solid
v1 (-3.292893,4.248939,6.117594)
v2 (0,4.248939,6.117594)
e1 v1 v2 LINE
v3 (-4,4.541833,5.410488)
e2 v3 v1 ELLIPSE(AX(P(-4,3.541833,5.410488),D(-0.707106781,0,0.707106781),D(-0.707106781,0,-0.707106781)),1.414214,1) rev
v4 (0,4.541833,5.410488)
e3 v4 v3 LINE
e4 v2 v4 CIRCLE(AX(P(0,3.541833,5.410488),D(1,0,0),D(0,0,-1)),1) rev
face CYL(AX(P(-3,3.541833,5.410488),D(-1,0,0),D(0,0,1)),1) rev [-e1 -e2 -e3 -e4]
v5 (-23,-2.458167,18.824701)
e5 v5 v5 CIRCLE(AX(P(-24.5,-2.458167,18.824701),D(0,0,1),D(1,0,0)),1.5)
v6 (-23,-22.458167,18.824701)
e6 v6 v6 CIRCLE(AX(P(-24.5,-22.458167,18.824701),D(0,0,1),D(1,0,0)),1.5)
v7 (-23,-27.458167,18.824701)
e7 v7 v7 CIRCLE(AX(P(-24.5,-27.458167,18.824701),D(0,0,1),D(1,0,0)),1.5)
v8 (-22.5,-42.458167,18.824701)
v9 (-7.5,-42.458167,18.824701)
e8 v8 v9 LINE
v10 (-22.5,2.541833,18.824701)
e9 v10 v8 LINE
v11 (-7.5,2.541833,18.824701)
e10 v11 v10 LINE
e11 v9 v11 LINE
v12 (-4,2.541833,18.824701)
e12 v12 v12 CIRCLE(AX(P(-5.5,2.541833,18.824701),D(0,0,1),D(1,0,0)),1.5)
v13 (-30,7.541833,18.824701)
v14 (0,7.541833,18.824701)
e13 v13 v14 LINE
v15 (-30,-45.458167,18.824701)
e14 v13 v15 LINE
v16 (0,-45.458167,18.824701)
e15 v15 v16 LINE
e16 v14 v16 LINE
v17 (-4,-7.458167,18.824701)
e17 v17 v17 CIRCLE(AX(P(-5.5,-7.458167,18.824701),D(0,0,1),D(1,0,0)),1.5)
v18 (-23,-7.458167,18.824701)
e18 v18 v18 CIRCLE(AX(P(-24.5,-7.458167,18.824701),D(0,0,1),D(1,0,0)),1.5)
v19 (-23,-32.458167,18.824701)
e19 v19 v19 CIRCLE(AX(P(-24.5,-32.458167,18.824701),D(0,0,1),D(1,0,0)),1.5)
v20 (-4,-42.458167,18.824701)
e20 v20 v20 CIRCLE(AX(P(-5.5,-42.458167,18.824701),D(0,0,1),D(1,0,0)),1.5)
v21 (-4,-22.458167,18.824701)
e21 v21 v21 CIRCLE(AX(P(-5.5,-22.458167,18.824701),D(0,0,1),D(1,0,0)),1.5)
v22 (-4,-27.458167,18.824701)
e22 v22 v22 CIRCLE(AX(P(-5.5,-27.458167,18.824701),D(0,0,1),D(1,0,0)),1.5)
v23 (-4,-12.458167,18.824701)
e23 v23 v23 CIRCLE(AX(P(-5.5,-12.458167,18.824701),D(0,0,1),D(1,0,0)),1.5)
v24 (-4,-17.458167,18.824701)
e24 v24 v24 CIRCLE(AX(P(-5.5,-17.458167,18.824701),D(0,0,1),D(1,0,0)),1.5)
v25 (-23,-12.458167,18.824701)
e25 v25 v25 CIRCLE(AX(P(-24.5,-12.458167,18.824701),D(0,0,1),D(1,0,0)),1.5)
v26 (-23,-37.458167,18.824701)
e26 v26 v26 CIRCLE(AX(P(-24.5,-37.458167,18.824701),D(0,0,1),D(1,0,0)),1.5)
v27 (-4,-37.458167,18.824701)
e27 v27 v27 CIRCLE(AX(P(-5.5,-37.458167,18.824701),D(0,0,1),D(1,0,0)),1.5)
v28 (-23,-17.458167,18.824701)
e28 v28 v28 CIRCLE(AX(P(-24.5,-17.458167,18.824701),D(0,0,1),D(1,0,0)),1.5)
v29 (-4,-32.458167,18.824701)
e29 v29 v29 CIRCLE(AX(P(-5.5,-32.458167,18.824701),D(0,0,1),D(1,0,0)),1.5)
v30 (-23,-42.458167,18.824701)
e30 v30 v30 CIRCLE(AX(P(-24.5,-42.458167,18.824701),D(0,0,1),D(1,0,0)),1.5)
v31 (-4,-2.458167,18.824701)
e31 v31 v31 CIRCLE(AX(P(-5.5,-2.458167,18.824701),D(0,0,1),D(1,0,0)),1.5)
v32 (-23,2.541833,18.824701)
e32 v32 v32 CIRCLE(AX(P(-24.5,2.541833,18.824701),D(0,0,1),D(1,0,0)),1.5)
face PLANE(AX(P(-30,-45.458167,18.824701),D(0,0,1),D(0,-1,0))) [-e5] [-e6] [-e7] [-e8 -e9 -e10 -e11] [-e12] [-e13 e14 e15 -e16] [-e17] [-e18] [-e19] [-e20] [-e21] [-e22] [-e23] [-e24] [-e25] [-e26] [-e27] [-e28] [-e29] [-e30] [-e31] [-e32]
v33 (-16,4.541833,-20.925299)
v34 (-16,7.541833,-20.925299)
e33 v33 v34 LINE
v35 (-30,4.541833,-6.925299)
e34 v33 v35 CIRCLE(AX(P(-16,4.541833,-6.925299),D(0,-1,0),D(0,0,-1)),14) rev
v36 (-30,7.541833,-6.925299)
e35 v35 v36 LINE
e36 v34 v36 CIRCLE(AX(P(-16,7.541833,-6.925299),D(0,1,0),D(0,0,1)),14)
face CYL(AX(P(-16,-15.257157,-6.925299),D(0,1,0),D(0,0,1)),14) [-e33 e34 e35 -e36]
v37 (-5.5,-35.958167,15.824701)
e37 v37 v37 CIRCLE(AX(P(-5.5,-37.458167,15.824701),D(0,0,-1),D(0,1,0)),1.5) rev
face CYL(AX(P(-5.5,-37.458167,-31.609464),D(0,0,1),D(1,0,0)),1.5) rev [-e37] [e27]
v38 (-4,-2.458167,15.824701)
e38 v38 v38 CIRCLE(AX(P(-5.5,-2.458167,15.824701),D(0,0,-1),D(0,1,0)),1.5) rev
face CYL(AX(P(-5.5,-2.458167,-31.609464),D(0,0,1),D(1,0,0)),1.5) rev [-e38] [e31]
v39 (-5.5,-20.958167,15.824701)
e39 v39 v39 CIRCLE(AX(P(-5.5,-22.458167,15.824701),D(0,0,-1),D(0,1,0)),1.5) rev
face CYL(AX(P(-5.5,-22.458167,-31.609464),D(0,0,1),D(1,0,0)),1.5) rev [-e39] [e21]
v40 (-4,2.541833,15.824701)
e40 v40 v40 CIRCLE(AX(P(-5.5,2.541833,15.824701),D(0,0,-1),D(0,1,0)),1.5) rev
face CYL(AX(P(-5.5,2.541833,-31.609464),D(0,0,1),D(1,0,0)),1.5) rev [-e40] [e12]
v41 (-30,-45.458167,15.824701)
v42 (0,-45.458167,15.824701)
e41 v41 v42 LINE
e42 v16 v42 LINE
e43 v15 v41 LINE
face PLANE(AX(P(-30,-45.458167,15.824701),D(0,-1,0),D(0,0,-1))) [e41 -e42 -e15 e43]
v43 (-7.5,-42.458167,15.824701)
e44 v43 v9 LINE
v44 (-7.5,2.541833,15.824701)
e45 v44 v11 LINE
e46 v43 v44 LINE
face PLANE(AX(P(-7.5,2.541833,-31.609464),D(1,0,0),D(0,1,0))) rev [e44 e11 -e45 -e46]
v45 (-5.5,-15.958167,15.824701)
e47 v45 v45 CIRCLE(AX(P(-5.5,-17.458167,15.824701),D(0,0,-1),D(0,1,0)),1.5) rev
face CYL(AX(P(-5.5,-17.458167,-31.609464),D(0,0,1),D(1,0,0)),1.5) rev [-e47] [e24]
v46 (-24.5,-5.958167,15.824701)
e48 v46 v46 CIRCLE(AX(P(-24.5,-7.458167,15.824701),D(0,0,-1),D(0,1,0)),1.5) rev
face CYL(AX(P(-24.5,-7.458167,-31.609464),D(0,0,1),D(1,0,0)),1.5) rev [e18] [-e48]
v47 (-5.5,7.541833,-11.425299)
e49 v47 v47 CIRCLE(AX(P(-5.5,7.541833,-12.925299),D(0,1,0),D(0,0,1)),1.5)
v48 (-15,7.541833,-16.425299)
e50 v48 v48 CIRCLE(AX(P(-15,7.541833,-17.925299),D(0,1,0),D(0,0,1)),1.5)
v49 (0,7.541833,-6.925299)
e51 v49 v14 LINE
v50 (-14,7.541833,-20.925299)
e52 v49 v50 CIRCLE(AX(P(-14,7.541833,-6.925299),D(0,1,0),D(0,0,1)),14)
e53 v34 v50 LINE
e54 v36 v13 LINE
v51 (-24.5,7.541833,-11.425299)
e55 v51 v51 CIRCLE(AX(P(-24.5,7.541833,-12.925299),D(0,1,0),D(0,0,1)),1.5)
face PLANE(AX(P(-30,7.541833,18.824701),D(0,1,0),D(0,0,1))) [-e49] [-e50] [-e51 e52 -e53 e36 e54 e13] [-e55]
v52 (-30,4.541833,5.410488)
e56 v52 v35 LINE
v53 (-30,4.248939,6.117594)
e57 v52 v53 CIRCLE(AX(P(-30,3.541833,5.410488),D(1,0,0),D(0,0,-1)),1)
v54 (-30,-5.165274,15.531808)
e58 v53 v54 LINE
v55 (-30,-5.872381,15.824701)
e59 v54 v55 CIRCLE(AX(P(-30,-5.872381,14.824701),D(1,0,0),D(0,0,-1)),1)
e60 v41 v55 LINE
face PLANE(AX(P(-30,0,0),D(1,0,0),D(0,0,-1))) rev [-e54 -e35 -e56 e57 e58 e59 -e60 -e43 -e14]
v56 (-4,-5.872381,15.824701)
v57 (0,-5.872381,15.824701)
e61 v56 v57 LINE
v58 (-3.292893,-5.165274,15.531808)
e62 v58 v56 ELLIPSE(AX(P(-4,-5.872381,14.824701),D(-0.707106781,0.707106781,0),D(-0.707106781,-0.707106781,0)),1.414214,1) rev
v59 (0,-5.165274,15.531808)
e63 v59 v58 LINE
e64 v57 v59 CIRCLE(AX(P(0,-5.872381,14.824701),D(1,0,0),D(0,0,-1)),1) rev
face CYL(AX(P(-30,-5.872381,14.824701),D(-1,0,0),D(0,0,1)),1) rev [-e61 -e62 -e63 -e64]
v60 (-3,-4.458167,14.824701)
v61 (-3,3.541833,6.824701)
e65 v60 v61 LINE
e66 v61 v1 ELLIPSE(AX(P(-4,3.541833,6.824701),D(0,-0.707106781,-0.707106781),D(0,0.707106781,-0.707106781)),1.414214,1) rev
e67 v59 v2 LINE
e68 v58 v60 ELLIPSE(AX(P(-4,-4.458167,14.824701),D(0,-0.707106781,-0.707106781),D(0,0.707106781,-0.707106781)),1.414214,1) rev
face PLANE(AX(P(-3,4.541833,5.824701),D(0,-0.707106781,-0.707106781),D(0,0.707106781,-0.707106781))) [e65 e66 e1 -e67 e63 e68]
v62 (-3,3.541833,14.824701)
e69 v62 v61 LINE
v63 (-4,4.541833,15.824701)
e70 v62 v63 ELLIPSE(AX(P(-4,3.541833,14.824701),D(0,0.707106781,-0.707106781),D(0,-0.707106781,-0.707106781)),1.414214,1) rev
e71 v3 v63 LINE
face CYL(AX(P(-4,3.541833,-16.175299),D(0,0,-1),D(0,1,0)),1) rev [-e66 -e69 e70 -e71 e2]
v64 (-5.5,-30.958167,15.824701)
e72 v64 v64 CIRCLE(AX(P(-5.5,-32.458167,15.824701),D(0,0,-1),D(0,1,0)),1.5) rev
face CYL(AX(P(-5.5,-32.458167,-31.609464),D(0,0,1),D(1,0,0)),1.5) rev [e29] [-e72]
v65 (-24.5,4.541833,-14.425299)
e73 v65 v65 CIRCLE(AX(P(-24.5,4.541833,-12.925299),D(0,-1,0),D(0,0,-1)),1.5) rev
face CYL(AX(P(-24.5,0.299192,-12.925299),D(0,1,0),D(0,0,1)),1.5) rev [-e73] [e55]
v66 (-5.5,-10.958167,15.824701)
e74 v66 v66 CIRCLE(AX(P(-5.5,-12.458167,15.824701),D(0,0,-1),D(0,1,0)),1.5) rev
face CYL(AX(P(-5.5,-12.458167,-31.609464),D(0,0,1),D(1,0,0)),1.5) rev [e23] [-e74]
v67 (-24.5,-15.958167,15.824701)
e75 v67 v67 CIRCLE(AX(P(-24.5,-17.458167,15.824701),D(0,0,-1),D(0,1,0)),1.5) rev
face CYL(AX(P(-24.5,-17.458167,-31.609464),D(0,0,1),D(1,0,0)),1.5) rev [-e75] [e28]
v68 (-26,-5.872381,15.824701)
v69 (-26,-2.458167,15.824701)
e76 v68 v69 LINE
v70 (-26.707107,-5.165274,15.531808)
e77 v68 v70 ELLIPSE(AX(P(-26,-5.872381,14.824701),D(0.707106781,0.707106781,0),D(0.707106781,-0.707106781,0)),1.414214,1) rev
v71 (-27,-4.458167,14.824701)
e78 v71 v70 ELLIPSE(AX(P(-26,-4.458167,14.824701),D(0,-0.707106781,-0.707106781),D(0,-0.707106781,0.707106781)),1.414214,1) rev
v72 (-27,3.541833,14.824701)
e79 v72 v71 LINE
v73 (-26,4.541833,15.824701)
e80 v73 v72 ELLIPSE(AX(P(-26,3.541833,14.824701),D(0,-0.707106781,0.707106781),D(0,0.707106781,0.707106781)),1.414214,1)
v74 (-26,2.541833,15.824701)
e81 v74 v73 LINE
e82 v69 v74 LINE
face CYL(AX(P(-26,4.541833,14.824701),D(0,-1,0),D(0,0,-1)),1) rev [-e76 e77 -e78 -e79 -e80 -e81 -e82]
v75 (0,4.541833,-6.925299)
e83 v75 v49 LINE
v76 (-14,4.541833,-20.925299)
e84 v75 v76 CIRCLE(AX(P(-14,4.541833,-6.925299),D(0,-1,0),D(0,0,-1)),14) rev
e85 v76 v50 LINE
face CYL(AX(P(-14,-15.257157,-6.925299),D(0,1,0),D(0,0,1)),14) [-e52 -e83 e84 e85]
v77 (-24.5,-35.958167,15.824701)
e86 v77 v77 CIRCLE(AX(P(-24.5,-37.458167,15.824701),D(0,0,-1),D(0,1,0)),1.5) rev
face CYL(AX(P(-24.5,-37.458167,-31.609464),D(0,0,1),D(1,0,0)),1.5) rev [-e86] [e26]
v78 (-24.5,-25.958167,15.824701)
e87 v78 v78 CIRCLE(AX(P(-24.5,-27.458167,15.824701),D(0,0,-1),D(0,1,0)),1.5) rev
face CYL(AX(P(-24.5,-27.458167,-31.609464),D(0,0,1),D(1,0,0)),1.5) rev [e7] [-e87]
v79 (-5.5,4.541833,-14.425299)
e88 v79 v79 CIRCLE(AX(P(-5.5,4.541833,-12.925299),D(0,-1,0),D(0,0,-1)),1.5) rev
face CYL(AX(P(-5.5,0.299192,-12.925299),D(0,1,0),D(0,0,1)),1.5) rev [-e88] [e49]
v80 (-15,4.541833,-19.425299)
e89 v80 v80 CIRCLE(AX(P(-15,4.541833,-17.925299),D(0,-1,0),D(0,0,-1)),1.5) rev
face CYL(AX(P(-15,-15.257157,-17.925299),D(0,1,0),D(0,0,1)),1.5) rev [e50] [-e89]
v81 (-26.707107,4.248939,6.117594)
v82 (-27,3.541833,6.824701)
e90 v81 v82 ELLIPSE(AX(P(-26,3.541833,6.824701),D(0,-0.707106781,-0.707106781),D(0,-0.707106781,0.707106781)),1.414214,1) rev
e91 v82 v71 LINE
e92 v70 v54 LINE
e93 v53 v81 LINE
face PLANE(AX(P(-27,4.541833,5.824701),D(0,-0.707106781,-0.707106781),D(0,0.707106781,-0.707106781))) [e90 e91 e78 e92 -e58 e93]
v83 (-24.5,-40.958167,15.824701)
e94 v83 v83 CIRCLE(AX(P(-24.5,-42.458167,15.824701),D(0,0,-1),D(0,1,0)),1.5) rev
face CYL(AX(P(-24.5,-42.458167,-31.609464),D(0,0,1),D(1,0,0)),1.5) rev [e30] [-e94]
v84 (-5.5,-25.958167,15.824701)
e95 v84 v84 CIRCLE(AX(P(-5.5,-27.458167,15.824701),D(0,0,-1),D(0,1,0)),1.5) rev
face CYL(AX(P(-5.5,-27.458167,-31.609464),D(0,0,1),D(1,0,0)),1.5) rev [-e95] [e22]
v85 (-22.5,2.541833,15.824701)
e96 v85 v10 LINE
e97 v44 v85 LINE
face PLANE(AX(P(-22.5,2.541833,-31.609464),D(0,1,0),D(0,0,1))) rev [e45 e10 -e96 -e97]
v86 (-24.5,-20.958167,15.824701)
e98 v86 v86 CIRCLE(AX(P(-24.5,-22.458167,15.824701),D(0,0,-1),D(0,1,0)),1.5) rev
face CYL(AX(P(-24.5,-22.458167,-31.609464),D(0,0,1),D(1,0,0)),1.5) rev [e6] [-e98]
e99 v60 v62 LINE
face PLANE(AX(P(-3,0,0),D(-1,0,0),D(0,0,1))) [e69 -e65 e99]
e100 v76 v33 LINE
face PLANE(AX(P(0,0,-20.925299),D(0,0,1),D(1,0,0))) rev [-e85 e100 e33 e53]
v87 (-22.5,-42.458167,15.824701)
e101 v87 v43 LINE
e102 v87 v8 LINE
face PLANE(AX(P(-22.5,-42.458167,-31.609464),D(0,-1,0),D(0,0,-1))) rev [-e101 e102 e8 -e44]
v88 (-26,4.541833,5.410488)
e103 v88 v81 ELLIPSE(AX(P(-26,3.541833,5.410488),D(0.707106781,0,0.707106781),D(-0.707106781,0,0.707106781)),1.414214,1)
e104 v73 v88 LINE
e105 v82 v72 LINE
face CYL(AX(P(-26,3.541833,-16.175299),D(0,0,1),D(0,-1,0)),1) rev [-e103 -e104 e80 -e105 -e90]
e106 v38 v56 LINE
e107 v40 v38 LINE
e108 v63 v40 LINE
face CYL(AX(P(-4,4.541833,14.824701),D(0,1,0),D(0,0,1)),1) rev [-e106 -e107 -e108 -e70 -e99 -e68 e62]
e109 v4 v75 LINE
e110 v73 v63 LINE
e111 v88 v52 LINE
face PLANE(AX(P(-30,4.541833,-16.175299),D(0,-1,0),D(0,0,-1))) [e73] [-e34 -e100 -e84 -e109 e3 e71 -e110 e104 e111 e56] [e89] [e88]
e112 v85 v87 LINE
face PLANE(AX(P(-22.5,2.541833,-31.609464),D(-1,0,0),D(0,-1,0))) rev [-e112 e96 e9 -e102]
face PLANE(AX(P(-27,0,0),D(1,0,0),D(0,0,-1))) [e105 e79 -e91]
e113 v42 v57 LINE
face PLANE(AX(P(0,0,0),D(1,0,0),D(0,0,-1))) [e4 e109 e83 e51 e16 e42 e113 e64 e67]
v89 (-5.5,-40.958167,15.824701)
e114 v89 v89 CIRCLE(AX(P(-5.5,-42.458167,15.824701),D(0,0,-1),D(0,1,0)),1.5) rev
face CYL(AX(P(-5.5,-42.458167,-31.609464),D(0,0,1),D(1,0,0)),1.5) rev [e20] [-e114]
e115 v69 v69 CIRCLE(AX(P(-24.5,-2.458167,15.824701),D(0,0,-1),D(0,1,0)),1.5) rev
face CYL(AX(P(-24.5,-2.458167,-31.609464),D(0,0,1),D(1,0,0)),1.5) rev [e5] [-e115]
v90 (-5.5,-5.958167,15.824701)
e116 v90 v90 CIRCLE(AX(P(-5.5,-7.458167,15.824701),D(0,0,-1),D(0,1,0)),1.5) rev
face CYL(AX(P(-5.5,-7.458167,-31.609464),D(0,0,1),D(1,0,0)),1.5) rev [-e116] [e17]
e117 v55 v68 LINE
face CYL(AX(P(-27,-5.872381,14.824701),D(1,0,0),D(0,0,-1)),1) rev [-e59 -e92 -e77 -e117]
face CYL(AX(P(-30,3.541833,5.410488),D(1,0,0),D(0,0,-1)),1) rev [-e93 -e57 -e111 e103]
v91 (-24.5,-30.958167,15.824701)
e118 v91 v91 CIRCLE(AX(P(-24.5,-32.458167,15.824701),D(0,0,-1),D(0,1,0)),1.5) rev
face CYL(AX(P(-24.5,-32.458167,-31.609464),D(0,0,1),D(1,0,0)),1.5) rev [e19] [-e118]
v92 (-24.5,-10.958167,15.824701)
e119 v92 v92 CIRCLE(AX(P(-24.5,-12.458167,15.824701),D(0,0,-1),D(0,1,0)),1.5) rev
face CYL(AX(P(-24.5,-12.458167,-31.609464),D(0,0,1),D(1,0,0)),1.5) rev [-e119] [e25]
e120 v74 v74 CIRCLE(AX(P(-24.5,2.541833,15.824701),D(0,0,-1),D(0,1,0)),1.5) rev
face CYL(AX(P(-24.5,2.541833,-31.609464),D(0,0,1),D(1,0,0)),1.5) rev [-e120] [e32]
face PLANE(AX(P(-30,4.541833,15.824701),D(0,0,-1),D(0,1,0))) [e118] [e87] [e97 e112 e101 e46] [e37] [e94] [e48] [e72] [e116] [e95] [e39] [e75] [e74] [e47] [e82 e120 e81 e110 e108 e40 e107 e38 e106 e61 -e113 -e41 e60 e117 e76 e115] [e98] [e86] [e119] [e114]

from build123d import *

# Parameters (mm, degrees)
BOSS_EXTRUDE1_DEPTH = 30
SKETCH2_R           = 1.5
CUT_EXTRUDE1_DEPTH  = 3
SKETCH3_R           = 1.5
SKETCH3_W           = 15
SKETCH3_H           = 45
CUT_EXTRUDE2_DEPTH  = 3
SKETCH4_W           = 30
SKETCH4_H           = 3
BOSS_EXTRUDE2_DEPTH = 4.75
SKETCH5_R           = 1.5
CUT_EXTRUDE3_DEPTH  = 3
BOSS_EXTRUDE3_DEPTH = 3
BOSS_EXTRUDE4_DEPTH = 3
FILLET1_R           = 1


with BuildPart() as part:
    # Sketch1 → Boss-Extrude1 (new body)
    with BuildSketch(Plane(origin=(0, 0, 0), x_dir=(0, 0, -1), z_dir=(1, 0, 0))):
        Polygon((16.175298805, 7.541832669), (16.175298805, 4.541832669), (-15.824701195, 4.541832669), (-15.824701195, -45.458167331), (-18.824701195, -45.458167331), (-18.824701195, 7.541832669), align=None)
    extrude(amount=-BOSS_EXTRUDE1_DEPTH)

    # Sketch2 → Cut-Extrude1 (cut)
    with BuildSketch(Plane(origin=(0, 7.541832669, 0), x_dir=(1, 0, 0), z_dir=(0, 1, 0))):
        with Locations(Location((-5.5, 12.925298805, 0), (0, 0, 270))):
            Circle(SKETCH2_R)
        with Locations(Location((-24.5, 12.925298805, 0), (0, 0, 270))):
            Circle(SKETCH2_R)
    extrude(amount=-CUT_EXTRUDE1_DEPTH, mode=Mode.SUBTRACT)

    # Sketch3 → Cut-Extrude2 (cut)
    with BuildSketch(Plane.XY.offset(18.824701195)):
        with Locations((-24.5, 2.541832669)):
            Circle(SKETCH3_R)
        with Locations((-5.5, 2.541832669)):
            Circle(SKETCH3_R)
        with Locations((-24.5, -2.458167331)):
            Circle(SKETCH3_R)
        with Locations((-5.5, -2.458167331)):
            Circle(SKETCH3_R)
        with Locations((-24.5, -7.458167331)):
            Circle(SKETCH3_R)
        with Locations((-5.5, -7.458167331)):
            Circle(SKETCH3_R)
        with Locations((-24.5, -12.458167331)):
            Circle(SKETCH3_R)
        with Locations((-5.5, -12.458167331)):
            Circle(SKETCH3_R)
        with Locations((-24.5, -17.458167331)):
            Circle(SKETCH3_R)
        with Locations((-5.5, -17.458167331)):
            Circle(SKETCH3_R)
        with Locations((-24.5, -22.458167331)):
            Circle(SKETCH3_R)
        with Locations((-5.5, -22.458167331)):
            Circle(SKETCH3_R)
        with Locations((-24.5, -27.458167331)):
            Circle(SKETCH3_R)
        with Locations((-5.5, -27.458167331)):
            Circle(SKETCH3_R)
        with Locations((-24.5, -32.458167331)):
            Circle(SKETCH3_R)
        with Locations((-5.5, -32.458167331)):
            Circle(SKETCH3_R)
        with Locations((-24.5, -37.458167331)):
            Circle(SKETCH3_R)
        with Locations((-5.5, -37.458167331)):
            Circle(SKETCH3_R)
        with Locations((-24.5, -42.458167331)):
            Circle(SKETCH3_R)
        with Locations((-5.5, -42.458167331)):
            Circle(SKETCH3_R)
        with Locations((-15, -19.958167331)):
            Rectangle(SKETCH3_W, SKETCH3_H)
    extrude(amount=-CUT_EXTRUDE2_DEPTH, mode=Mode.SUBTRACT)

    # Sketch4 → Boss-Extrude2 (add)
    with BuildSketch(Plane(origin=(0, 0, -16.175298805), x_dir=(-1, 0, 0), z_dir=(0, 0, -1))):
        with Locations((15, 6.041832669)):
            Rectangle(SKETCH4_W, SKETCH4_H)
    extrude(amount=BOSS_EXTRUDE2_DEPTH)

    # Sketch5 → Cut-Extrude3 (cut)
    with BuildSketch(Plane(origin=(0, 7.541832669, 0), x_dir=(1, 0, 0), z_dir=(0, 1, 0))):
        with BuildLine():
            ThreePointArc((-30, 6.925298805), (-25.899494937, 16.824793741), (-16, 20.925298805))
            Line((-16, 20.925298805), (-30, 20.925298805))
            Line((-30, 20.925298805), (-30, 6.925298805))
        make_face()
        with Locations(Location((-15, 17.925298805, 0), (0, 0, 270))):
            Circle(SKETCH5_R)
        with BuildLine():
            Line((0, 20.925298805), (-14, 20.925298805))
            ThreePointArc((-14, 20.925298805), (-4.100505063, 16.824793741), (0, 6.925298805))
            Line((0, 6.925298805), (0, 20.925298805))
        make_face()
    extrude(amount=-CUT_EXTRUDE3_DEPTH, mode=Mode.SUBTRACT)

    # Sketch6 → Boss-Extrude3 (add)
    with BuildSketch(Plane(origin=(0, 0, 0), x_dir=(0, 0, -1), z_dir=(1, 0, 0))):
        Polygon((-15.824701195, 4.541832669), (-5.824701195, 4.541832669), (-15.824701195, -5.458167331), align=None)
    extrude(amount=-BOSS_EXTRUDE3_DEPTH)

    # Sketch7 → Boss-Extrude4 (add)
    with BuildSketch(Plane.ZY.offset(30)):
        Polygon((5.824701195, 4.541832669), (15.824701195, -5.458167331), (15.824701195, 4.541832669), align=None)
    extrude(amount=-BOSS_EXTRUDE4_DEPTH)

    # Fillet1
    fillet1_edges = [part.edges().sort_by_distance(p)[0] for p in [
        (-3, -0.458167331, 15.824701195),
        (-1.5, -5.458167331, 15.824701195),
        (-3, 4.541832669, 10.824701195),
        (-1.5, 4.541832669, 5.824701195),
        (-27, 4.541832669, 10.824701195),
        (-28.5, 4.541832669, 5.824701195),
        (-27, -0.458167331, 15.824701195),
        (-28.5, -5.458167331, 15.824701195),
    ]]
    fillet(fillet1_edges, radius=FILLET1_R - 0.0001)  # a hair under: the kernel refuses the full size


solid = part.part
